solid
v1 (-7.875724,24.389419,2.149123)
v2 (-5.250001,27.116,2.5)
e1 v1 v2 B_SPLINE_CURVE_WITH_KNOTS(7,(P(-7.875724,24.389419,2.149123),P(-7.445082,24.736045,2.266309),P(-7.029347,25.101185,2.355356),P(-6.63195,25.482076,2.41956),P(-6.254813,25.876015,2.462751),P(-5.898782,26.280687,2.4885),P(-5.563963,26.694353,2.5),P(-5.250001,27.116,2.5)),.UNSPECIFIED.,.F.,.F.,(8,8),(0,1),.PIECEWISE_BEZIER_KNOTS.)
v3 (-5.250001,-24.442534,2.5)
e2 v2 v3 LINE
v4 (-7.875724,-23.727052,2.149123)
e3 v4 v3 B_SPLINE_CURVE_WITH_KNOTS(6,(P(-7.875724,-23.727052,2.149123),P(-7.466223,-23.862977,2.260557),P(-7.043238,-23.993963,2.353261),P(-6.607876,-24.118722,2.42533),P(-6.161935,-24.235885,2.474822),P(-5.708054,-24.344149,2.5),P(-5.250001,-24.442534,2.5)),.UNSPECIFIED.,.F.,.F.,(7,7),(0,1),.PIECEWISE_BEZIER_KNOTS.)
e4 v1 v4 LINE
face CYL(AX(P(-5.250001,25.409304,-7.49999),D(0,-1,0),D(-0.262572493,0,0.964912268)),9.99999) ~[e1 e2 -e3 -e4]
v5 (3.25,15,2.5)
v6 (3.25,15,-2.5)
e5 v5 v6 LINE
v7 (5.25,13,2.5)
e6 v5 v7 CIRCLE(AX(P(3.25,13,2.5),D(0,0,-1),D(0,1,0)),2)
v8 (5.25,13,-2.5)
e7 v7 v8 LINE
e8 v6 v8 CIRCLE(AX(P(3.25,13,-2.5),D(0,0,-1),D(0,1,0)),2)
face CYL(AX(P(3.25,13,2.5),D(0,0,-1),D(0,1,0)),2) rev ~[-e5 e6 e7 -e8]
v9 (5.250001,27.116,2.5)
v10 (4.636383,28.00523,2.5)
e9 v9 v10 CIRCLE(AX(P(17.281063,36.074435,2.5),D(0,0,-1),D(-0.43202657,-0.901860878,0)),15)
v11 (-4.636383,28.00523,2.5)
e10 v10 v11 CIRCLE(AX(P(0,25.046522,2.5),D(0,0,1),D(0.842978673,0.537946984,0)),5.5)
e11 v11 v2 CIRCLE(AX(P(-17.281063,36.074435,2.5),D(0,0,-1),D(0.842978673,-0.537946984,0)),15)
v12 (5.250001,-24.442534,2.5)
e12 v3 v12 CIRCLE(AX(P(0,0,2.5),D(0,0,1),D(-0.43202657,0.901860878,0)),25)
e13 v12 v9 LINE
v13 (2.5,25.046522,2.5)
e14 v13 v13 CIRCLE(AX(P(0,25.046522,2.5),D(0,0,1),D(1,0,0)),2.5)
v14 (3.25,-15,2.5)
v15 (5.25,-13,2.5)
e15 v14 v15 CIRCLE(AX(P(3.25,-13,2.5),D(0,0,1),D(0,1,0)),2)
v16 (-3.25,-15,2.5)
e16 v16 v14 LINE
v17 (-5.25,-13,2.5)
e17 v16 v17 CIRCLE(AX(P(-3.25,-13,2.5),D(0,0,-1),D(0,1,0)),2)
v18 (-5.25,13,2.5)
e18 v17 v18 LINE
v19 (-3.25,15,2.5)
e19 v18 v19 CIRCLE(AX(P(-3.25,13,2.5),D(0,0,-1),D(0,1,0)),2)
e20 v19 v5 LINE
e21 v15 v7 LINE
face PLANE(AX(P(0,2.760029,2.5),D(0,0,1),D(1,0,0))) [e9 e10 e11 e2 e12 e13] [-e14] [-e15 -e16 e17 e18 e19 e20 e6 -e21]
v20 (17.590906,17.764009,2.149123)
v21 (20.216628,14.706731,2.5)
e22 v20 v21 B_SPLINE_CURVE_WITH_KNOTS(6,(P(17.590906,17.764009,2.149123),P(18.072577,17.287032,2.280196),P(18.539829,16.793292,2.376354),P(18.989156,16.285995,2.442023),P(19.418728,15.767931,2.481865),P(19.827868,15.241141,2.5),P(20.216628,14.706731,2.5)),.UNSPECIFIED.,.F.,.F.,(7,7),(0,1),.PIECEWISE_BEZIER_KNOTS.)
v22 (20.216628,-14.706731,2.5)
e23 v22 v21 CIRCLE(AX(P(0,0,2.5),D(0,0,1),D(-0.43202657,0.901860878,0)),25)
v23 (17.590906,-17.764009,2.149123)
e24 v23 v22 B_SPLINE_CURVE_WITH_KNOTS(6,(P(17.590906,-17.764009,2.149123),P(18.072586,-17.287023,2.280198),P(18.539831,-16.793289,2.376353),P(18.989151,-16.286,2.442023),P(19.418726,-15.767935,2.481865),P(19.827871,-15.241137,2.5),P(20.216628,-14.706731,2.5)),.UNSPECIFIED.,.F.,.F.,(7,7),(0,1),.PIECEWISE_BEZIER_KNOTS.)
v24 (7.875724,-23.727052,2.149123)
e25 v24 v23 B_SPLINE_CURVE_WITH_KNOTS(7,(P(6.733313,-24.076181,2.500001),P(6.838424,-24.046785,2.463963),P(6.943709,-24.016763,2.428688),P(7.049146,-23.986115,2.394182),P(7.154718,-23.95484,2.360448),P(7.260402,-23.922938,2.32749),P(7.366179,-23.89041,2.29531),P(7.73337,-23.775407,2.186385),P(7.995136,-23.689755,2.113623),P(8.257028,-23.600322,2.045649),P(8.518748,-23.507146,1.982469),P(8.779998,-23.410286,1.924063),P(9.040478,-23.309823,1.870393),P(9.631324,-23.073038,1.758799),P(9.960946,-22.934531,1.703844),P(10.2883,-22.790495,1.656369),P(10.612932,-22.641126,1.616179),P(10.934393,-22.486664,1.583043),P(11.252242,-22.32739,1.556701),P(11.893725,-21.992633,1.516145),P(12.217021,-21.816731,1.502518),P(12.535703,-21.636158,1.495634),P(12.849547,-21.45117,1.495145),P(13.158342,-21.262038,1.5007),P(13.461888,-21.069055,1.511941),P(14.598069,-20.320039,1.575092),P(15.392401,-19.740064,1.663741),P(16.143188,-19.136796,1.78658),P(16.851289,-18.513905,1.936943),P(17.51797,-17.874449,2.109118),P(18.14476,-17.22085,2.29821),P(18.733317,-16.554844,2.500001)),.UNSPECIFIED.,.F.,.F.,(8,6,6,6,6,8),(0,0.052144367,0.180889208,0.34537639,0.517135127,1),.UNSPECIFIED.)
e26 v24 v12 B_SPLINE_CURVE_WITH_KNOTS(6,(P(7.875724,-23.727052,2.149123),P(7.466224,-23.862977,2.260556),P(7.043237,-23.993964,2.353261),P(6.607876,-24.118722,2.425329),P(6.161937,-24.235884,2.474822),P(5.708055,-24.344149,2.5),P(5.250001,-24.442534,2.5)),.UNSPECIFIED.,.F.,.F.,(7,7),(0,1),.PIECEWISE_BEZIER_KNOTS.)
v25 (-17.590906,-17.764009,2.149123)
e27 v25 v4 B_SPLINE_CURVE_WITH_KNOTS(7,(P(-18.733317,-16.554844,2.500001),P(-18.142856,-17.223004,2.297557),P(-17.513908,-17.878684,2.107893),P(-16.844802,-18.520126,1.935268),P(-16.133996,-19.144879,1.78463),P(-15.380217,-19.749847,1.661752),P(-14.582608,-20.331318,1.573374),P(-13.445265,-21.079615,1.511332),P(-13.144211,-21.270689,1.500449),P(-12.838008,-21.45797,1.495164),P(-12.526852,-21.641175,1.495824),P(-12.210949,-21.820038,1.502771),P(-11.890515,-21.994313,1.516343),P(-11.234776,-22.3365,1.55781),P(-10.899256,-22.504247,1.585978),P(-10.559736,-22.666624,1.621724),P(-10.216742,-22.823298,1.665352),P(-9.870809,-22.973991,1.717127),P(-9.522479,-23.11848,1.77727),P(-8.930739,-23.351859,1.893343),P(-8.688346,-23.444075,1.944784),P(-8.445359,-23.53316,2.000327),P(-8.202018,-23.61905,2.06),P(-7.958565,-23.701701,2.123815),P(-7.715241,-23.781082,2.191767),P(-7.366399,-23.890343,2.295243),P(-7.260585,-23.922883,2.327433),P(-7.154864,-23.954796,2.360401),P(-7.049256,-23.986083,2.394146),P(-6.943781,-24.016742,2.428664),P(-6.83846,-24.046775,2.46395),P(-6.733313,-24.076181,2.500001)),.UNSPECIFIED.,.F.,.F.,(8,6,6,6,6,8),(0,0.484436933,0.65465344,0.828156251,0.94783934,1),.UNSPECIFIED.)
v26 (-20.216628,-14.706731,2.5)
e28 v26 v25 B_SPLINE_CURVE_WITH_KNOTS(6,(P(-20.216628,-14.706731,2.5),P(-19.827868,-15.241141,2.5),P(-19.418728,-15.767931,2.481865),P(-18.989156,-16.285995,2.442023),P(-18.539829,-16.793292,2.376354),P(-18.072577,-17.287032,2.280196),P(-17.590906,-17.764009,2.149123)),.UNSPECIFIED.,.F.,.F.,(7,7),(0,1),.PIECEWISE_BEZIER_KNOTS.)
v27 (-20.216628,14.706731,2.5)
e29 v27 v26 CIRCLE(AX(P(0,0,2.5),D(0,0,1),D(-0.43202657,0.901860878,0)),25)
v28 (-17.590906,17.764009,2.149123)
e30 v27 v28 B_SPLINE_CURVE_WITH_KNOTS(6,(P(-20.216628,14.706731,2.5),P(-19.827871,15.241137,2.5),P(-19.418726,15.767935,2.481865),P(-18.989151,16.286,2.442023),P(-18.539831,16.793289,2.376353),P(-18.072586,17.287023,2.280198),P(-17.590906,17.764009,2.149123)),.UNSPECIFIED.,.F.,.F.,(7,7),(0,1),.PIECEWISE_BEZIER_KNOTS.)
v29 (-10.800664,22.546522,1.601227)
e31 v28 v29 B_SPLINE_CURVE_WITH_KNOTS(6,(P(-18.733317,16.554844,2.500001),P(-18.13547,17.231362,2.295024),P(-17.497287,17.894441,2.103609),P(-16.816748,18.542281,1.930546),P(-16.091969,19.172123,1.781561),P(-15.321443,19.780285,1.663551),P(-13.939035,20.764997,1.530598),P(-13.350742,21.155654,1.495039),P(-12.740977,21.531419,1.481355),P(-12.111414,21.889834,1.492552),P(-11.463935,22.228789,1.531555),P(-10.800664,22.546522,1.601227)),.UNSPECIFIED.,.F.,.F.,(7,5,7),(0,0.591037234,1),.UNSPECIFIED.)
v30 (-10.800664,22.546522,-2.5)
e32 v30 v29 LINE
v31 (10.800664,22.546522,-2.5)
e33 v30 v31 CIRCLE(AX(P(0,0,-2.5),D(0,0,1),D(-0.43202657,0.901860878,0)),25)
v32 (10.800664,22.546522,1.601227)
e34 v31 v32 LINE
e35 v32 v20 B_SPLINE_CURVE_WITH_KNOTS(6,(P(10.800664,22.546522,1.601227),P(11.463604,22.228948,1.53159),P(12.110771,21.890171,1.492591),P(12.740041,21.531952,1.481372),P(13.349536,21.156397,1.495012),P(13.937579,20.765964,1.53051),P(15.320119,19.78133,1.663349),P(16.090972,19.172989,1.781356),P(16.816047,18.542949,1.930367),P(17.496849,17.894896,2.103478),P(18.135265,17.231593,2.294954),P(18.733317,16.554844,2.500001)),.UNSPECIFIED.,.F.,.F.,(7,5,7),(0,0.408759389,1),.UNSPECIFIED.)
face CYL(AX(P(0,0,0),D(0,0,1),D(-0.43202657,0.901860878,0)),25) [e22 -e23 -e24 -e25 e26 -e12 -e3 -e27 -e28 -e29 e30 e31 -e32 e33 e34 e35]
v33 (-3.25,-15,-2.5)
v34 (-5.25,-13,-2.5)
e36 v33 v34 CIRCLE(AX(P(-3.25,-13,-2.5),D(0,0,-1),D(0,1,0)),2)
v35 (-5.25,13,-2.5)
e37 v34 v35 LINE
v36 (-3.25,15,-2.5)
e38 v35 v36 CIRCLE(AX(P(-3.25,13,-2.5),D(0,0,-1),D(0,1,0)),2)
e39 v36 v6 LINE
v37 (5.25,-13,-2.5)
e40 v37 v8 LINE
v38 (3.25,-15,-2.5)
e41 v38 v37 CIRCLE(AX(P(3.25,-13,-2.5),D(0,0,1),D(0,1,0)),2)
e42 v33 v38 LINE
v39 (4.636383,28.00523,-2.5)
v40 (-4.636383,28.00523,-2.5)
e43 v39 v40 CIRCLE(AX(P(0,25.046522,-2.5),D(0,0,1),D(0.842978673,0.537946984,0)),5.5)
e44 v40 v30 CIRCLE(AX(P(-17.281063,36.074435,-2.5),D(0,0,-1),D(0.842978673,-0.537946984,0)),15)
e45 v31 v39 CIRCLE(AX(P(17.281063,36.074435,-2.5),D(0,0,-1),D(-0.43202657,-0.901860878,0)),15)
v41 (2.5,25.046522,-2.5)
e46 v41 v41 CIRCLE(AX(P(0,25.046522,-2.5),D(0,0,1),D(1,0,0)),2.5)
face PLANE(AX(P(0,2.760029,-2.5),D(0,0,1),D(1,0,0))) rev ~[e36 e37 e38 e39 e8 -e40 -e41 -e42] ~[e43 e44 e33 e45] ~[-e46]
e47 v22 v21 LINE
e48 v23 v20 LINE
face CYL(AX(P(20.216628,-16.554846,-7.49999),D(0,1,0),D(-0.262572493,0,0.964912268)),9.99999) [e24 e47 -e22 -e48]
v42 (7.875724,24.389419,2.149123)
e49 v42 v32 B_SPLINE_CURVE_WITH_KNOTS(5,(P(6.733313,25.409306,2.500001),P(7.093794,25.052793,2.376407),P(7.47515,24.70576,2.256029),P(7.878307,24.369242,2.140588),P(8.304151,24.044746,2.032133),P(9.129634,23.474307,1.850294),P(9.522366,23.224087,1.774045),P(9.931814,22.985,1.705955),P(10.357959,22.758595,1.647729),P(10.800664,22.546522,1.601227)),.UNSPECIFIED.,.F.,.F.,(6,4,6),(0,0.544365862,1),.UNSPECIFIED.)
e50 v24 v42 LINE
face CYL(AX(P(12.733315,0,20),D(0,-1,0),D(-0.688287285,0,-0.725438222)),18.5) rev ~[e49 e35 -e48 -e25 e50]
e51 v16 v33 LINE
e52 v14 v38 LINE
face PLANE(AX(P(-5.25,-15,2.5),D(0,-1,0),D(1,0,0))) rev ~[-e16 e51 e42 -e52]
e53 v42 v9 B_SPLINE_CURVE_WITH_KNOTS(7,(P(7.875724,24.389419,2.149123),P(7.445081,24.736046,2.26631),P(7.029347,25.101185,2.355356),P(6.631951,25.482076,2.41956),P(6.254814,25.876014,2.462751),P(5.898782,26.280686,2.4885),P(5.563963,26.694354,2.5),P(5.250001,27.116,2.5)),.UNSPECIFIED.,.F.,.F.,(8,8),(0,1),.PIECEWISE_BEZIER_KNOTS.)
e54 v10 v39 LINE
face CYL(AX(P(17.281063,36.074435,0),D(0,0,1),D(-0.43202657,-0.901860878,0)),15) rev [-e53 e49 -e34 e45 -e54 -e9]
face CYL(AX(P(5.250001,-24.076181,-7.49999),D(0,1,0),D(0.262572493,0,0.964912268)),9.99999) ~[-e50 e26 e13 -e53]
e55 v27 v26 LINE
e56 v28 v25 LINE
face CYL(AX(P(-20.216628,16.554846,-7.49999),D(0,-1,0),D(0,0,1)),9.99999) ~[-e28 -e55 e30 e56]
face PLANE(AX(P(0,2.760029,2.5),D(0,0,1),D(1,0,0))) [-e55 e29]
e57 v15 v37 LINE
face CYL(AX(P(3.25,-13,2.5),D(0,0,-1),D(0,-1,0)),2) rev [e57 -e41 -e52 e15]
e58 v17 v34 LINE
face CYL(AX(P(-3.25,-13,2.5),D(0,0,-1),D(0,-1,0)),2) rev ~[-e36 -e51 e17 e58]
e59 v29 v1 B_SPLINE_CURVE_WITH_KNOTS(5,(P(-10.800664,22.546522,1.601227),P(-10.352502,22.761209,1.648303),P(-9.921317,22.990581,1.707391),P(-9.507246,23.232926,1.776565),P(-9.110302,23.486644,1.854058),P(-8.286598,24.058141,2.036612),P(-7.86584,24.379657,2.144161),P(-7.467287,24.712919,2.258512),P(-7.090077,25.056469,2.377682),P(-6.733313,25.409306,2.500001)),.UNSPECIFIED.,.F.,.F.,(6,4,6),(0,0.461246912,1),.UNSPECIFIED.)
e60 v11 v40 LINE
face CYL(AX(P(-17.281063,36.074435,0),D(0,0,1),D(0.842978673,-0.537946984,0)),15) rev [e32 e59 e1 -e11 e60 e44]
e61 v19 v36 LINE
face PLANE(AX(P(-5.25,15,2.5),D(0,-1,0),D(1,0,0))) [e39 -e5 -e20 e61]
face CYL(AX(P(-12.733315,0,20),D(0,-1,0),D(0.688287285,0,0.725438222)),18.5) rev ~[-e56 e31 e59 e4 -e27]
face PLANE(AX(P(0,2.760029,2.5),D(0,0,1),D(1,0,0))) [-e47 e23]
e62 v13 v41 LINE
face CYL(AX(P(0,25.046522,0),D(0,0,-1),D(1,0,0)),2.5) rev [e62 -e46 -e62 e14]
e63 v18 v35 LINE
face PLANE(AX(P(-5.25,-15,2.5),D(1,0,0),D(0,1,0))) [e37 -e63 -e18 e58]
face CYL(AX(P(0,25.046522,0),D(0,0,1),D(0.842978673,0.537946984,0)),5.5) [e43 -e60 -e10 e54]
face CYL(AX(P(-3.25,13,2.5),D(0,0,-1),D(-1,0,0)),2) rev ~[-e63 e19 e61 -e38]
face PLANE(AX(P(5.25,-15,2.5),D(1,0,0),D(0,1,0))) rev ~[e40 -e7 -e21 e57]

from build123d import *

# Parameters (mm, degrees)
F0_R          = 2.5
F1_DEPTH      = 2.5
F2_W          = 10.5
F2_H          = 30
F3_DEPTH      = 5.001
F5_DEPTH      = 30.5475219467
F5_DEPTH_BACK = 25.001
F6_R          = 9.99999
F7_R          = 2


# Not quite as in the source:
# - a fillet or chamfer is up to 0.001 mm smaller than in the source, because OpenCascade refuses the exact size


with BuildPart() as f1:
    # F0 (on Top) → F1 (new body, symmetric)
    with BuildSketch(Plane.XY):
        with BuildLine():
            ThreePointArc((-4.6363826998, 28.0052303576), (-7.3366406052, 24.8446324714), (-10.8006642439, 22.5465219467))
            ThreePointArc((-10.8006642439, 22.5465219467), (0, -25), (10.8006642439, 22.5465219467))
            ThreePointArc((10.8006642439, 22.5465219467), (7.3366406052, 24.8446324714), (4.6363826998, 28.0052303576))
            ThreePointArc((4.6363826998, 28.0052303576), (0, 30.5465219467), (-4.6363826998, 28.0052303576))
        make_face()
        with Locations((0, 25.0465219467)):
            Circle(F0_R, mode=Mode.SUBTRACT)
    extrude(amount=F1_DEPTH, both=True)

    # F2 (on face) → F3 (cut, through all)
    with BuildSketch(Plane.XY.offset(2.5)):
        Rectangle(F2_W, F2_H)
    extrude(amount=-F3_DEPTH, mode=Mode.SUBTRACT)

    # F4 (on Front) → F5 (cut, two sides)
    with BuildSketch(Plane.XZ) as f5_sk:
        with BuildLine():
            ThreePointArc((0, 6.579392902), (31.2333147735, 20), (0, 33.420607098))
            ThreePointArc((0, 33.420607098), (-31.2333147735, 20), (0, 6.579392902))
        make_face()
    extrude(amount=-F5_DEPTH, mode=Mode.SUBTRACT)
    extrude(f5_sk.sketch, amount=F5_DEPTH_BACK, mode=Mode.SUBTRACT)

    # F6 (radius 10 in the source; OpenCascade refuses exactly that, so slightly less here)
    f6_edges = [f1.edges().sort_by_distance(p)[0] for p in [
        (-6.733315, 0.666562, 2.5),
        (-18.733315, 0, 2.5),
        (6.733315, 0.666562, 2.5),
        (18.733315, 0, 2.5),
    ]]
    fillet(f6_edges, radius=F6_R)

    # F7
    f7_edges = [f1.edges().sort_by_distance(p)[0] for p in [
        (5.25, 15, 0),
        (5.25, -15, 0),
        (-5.25, -15, 0),
        (-5.25, 15, 0),
    ]]
    fillet(f7_edges, radius=F7_R)


solid = f1.part
